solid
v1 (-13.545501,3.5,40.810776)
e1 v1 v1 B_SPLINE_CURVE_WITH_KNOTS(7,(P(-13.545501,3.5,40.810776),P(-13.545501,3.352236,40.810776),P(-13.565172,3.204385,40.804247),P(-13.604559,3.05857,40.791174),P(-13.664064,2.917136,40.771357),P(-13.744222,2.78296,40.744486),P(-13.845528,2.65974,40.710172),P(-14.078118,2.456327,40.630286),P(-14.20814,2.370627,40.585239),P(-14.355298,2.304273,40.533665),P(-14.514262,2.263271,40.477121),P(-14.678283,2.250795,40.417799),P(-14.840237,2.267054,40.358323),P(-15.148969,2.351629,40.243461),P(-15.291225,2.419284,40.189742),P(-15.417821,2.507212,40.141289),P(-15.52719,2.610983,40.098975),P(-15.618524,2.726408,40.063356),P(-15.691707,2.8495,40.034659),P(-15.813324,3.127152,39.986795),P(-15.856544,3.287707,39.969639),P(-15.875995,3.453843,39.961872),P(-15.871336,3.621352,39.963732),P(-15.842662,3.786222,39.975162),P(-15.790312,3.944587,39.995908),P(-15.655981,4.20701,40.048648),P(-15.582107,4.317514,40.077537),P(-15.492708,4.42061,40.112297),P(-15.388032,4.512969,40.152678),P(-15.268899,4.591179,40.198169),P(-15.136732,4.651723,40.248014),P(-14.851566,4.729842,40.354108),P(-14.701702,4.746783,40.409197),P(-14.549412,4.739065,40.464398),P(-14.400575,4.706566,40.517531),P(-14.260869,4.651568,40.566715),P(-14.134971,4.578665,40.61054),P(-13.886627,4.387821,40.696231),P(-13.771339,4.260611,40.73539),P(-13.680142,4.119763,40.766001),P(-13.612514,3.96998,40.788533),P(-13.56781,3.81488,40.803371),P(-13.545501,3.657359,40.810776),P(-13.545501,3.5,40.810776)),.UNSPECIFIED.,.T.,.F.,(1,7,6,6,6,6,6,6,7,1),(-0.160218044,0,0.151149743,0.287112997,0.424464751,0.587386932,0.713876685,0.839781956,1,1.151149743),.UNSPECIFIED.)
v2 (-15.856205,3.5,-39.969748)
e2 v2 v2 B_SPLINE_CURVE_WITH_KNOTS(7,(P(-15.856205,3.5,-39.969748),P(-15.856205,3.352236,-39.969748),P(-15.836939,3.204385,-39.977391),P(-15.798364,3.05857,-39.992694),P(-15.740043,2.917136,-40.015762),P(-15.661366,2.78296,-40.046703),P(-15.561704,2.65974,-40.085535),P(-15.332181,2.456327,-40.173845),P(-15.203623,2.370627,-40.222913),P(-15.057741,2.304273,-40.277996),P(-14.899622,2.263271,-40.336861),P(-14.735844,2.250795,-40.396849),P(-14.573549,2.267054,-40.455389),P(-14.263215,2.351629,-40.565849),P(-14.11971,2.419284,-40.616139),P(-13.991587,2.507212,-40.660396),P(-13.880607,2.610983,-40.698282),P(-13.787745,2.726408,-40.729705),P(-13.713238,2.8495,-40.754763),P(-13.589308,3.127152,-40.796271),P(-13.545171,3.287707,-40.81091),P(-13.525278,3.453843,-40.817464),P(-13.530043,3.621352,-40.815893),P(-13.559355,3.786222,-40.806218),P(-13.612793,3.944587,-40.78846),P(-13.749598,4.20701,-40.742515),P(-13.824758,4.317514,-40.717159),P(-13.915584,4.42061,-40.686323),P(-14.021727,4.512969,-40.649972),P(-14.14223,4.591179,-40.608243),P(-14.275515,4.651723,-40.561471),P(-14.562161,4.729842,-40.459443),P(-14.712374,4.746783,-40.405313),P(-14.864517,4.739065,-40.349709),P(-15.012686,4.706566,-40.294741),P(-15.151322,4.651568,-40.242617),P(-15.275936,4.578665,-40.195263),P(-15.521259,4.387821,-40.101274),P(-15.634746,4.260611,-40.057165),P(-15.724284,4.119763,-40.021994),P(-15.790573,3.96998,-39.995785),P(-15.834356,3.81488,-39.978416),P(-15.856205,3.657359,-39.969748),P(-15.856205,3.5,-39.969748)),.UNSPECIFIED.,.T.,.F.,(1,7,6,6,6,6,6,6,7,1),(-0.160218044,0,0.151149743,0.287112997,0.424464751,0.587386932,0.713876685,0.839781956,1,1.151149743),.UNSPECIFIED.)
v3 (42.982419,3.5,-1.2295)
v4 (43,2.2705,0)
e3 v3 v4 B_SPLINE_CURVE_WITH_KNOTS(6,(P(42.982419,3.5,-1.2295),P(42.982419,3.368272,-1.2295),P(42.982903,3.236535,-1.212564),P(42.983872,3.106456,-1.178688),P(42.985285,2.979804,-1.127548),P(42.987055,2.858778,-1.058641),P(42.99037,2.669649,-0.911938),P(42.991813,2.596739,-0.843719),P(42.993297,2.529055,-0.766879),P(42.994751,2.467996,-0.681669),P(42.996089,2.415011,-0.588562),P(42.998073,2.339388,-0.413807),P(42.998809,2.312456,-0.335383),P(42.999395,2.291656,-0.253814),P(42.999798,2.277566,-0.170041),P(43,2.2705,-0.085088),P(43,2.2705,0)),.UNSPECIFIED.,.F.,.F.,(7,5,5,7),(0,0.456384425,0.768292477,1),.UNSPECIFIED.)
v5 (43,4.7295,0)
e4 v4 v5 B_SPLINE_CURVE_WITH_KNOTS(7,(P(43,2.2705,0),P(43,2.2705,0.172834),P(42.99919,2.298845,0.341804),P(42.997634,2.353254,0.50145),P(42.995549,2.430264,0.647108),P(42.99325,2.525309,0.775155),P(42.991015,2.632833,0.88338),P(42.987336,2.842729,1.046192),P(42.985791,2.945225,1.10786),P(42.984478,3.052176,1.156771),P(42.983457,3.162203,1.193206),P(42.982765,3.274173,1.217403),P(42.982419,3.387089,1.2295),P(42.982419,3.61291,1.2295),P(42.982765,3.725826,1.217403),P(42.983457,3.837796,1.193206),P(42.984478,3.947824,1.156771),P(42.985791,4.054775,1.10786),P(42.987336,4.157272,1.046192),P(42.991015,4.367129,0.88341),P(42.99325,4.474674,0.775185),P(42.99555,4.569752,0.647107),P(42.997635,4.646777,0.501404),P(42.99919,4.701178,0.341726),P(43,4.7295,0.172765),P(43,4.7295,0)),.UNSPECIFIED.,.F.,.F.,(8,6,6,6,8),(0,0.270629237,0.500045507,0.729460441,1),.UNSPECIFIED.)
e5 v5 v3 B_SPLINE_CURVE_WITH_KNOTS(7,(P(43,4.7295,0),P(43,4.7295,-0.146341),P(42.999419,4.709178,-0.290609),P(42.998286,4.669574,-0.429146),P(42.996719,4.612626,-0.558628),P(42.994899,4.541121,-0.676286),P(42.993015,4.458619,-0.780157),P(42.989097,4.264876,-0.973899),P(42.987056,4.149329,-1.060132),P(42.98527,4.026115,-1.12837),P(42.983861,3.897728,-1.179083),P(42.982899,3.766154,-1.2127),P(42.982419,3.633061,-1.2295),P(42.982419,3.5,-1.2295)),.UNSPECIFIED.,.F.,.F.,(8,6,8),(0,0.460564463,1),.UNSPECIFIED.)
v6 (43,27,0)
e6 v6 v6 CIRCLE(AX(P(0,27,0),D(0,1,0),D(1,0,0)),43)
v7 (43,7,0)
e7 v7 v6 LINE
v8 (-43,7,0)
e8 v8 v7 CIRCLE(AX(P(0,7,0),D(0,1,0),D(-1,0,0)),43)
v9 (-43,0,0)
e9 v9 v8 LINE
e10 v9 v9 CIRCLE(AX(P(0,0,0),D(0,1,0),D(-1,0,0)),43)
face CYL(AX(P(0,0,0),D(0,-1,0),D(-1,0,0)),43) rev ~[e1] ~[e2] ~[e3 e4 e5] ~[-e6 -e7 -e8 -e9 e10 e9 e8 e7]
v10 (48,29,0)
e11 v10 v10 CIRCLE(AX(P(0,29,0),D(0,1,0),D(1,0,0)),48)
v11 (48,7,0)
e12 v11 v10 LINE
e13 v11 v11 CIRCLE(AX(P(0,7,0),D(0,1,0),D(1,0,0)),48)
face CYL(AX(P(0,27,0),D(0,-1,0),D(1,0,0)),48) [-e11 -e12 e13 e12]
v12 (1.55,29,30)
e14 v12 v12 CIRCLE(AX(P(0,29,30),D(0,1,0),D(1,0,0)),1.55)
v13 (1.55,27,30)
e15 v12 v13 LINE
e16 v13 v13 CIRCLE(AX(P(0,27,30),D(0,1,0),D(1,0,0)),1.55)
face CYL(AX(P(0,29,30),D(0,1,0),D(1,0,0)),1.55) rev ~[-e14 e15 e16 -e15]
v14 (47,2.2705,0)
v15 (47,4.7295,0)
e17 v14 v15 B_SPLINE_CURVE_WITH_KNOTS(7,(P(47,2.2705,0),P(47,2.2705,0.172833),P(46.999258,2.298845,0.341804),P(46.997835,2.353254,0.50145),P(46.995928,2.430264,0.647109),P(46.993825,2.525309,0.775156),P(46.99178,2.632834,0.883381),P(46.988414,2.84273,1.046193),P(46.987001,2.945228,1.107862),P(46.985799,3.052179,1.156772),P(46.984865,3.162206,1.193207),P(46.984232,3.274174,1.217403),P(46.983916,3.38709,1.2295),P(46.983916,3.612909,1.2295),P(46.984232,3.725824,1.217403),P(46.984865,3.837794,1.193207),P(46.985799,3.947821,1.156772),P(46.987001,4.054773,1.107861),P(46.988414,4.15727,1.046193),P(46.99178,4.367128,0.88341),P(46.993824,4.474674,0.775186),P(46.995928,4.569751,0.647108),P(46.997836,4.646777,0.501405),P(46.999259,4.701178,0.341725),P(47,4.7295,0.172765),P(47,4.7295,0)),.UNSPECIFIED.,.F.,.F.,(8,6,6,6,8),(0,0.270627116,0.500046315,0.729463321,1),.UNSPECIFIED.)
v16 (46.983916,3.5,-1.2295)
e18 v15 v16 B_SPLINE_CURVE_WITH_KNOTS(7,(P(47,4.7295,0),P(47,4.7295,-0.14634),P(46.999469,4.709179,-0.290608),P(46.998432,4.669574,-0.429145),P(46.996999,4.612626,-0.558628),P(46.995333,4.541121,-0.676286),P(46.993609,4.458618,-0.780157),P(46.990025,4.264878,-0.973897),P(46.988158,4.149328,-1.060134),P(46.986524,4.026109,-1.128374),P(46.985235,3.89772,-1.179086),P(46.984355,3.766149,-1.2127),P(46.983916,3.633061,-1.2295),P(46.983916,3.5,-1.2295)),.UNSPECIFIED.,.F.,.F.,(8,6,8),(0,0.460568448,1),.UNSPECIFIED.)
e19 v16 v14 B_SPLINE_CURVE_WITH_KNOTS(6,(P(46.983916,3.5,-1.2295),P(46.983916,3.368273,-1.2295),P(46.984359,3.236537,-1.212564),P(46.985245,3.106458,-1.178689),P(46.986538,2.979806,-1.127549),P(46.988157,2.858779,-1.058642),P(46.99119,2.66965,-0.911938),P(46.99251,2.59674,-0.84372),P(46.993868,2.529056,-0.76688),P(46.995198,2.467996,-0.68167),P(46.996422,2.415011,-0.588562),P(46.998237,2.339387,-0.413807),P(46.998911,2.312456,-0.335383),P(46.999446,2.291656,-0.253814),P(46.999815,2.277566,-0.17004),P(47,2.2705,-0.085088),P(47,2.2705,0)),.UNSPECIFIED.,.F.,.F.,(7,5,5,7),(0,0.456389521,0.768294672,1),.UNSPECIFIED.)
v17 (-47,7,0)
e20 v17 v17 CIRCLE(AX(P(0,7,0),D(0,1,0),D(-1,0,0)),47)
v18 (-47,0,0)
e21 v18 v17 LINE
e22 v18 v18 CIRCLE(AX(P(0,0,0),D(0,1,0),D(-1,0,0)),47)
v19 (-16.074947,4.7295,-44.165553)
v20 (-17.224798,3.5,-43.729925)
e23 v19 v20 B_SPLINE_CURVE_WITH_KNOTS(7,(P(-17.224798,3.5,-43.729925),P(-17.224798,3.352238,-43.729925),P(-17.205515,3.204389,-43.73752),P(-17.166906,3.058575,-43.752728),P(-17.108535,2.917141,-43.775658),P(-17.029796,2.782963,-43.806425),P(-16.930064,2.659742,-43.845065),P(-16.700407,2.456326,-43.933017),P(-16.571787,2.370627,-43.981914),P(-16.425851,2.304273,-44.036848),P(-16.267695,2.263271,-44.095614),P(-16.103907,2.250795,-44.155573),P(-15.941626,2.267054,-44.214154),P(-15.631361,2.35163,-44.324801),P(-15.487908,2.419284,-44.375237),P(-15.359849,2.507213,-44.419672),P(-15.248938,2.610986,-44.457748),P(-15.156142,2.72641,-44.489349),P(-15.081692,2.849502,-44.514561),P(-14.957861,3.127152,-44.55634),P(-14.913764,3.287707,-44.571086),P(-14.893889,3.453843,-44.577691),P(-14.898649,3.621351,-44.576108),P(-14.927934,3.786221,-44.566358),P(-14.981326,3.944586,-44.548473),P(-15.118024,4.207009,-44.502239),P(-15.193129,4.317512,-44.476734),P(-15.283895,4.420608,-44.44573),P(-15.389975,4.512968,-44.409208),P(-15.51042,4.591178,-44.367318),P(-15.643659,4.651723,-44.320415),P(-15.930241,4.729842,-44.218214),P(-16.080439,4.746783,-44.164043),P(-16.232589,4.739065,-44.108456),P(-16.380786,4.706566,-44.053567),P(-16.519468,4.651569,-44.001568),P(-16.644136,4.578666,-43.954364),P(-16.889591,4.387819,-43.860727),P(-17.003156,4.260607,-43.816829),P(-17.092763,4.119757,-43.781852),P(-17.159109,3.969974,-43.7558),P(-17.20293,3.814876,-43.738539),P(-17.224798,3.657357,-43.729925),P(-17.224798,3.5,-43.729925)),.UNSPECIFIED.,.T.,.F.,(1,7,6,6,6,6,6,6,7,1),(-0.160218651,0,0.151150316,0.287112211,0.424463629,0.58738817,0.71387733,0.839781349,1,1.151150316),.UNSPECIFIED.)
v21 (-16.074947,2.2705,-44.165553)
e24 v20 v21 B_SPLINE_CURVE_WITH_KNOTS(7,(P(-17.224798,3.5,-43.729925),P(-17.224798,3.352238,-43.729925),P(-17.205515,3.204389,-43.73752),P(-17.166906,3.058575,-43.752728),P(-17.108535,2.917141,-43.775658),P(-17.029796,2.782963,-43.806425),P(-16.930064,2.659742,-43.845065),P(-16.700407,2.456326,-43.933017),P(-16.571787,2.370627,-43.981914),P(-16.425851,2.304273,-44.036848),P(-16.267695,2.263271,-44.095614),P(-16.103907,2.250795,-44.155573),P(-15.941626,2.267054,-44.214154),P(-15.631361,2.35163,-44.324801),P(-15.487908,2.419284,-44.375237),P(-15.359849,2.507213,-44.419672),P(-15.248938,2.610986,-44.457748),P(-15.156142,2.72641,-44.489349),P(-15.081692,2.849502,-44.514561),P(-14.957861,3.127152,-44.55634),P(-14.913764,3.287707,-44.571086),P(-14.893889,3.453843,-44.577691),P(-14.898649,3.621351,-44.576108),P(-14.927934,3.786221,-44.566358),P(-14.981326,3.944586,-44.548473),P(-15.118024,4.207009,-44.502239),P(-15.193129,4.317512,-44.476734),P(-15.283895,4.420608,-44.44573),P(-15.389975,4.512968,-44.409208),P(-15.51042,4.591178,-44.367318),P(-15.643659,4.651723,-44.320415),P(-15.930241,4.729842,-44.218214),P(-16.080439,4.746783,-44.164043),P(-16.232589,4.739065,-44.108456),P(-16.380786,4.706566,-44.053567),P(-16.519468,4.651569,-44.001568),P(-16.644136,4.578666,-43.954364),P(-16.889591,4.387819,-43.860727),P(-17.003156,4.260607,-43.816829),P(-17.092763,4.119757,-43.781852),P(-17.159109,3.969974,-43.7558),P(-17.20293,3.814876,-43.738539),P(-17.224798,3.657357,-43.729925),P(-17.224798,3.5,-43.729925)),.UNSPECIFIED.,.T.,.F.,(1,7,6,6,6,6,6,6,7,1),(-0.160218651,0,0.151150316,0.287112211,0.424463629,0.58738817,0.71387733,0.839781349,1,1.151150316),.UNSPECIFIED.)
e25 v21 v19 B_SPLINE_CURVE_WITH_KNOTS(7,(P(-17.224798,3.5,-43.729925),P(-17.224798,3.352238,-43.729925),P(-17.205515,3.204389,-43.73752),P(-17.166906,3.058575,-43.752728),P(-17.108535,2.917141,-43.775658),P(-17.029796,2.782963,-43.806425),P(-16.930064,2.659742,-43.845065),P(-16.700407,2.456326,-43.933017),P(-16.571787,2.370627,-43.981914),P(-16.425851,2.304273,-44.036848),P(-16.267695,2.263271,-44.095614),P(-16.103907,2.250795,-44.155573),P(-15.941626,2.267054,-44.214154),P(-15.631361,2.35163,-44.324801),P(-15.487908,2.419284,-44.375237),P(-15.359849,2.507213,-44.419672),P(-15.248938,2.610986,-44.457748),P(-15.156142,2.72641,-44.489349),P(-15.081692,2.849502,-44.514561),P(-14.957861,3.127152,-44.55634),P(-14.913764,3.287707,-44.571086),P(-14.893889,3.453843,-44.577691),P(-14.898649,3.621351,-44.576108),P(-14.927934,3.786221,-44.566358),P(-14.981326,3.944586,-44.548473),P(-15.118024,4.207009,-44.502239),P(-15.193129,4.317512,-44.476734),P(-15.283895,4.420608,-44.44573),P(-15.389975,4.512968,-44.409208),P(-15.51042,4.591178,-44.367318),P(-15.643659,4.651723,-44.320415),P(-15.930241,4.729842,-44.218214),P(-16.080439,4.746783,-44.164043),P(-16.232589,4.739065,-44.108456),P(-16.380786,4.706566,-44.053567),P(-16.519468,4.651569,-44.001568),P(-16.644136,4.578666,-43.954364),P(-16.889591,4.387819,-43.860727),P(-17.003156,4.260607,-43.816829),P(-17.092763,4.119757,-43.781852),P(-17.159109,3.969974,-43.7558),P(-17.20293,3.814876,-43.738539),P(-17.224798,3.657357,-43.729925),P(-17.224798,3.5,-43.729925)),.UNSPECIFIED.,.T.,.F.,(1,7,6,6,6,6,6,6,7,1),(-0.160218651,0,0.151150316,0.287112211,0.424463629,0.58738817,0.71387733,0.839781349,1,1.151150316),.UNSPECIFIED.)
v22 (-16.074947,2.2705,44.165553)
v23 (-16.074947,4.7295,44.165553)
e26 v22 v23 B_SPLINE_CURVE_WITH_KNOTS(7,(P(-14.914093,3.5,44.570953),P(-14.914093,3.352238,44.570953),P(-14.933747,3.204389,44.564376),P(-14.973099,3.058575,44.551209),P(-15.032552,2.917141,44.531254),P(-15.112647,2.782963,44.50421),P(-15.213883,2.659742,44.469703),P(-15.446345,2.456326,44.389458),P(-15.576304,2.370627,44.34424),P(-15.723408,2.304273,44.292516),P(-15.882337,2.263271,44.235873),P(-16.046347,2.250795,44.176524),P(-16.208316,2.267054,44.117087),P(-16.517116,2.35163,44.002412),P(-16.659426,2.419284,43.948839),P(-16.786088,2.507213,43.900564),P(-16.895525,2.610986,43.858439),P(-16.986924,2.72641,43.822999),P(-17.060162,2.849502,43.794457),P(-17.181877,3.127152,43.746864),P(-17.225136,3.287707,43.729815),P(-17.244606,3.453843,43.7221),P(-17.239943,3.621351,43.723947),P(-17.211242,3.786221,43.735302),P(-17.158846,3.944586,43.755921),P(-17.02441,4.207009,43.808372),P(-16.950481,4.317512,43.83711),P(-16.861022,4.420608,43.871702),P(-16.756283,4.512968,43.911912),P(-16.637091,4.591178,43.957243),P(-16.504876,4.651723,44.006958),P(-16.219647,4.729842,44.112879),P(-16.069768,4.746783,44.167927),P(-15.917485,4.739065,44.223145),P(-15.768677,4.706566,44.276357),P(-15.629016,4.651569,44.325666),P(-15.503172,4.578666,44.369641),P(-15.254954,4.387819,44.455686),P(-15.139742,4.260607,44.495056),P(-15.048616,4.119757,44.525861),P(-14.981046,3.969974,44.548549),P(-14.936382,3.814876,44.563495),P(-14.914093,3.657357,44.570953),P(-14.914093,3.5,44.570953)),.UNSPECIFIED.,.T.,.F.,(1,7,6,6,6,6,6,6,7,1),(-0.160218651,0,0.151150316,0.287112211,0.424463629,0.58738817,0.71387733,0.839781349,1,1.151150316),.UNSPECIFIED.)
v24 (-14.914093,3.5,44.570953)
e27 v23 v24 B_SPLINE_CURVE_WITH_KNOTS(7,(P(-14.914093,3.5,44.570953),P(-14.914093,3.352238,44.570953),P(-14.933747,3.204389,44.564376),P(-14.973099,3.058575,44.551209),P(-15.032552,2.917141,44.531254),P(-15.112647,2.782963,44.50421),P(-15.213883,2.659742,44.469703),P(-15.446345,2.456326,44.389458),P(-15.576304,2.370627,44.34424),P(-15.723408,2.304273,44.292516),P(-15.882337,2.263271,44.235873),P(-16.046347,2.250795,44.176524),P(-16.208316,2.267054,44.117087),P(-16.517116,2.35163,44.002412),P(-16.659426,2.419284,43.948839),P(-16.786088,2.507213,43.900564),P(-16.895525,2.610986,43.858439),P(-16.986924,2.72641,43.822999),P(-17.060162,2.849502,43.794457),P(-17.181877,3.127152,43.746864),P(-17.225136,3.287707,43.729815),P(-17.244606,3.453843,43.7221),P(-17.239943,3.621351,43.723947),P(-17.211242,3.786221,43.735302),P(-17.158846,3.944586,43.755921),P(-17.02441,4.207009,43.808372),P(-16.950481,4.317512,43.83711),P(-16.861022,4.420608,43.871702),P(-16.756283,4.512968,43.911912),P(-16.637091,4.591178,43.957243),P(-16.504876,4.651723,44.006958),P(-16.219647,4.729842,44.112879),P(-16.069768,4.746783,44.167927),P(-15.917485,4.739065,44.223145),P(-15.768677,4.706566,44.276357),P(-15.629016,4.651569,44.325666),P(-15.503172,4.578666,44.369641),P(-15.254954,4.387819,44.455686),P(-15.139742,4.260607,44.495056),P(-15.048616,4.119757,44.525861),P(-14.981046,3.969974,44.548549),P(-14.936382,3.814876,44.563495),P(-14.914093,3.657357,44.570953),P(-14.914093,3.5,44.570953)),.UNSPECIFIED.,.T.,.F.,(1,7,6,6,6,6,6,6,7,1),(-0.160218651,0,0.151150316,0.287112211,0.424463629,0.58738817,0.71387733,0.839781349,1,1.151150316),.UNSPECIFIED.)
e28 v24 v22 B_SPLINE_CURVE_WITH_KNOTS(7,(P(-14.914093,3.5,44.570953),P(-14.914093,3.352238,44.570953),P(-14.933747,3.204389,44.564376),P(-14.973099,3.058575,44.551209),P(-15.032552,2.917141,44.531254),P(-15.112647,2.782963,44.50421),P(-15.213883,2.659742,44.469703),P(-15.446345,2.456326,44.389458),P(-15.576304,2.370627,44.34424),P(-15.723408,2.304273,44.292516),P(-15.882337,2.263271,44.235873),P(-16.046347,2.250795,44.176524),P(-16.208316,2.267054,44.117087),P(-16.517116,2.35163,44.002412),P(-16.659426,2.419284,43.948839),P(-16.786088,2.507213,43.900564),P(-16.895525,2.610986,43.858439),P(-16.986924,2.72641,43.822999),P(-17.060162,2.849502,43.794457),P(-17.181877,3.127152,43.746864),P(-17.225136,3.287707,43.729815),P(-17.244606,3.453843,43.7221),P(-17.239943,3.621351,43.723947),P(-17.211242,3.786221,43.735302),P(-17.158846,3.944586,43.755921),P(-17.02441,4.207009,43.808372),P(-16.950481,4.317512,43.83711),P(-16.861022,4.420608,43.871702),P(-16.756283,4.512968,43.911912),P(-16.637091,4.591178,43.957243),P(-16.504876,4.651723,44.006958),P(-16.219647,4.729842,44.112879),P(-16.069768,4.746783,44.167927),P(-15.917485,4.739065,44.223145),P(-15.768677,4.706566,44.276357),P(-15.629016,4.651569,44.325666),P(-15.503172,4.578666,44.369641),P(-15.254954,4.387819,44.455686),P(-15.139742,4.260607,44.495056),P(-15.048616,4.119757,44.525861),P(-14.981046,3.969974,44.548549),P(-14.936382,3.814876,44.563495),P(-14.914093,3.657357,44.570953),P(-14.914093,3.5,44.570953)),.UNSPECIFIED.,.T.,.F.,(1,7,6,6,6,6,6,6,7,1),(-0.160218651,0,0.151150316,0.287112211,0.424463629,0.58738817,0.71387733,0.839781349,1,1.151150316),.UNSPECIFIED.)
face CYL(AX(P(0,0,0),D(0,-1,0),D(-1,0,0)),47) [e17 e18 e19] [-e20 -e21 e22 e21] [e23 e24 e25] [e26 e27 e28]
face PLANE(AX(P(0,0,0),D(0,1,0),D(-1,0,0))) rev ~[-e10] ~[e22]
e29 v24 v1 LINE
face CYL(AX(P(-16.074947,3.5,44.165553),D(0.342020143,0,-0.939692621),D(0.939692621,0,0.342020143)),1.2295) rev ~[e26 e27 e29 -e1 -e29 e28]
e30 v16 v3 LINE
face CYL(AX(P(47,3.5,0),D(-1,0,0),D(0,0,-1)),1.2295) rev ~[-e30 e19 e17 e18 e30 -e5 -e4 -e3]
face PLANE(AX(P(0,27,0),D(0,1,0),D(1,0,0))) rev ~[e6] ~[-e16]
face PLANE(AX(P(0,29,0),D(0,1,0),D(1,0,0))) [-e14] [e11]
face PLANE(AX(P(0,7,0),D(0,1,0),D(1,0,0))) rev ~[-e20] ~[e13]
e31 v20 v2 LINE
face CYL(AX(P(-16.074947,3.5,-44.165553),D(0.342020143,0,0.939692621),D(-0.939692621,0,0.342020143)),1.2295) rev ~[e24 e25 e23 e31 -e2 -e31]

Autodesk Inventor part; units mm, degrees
ref_plane "XZ Plane" through (0, 0, 0) normal (0, 1, 0) x (-1, 0, 0)
ref_plane "XY Plane" through (0, 0, 0) normal (0, 0, 1) x (1, 0, 0)
sketch "Sketch1" plane through (0, 0, 0) normal (0, 1, 0) x (-1, 0, 0)
  circle A0 centre (0, 0) radius 47
  circle A1 centre (0, 0) radius 43
  dimension "d0" = 94
  dimension "d8" = 4
extrude "Extrusion1" add sketch "Sketch1" along normal blind 7
sketch "Sketch2" plane through (0, 7, 0) normal (0, 1, 0) x (1, 0, 0)
  circle A0 centre (0, 0) radius 43
  circle A1 centre (0, 0) radius 48
  dimension "d38" = 86
  dimension "d39" = 96
extrude "Extrusion2" add sketch "Sketch2" along normal blind 20
sketch "Sketch6" plane through (0, 27, 0) normal (0, 1, 0) x (1, 0, 0)
  circle A0 centre (0, 0) radius 48 projected
extrude "Extrusion5" add sketch "Sketch6" along normal blind 2
ref_plane "Work Plane2" through (47, 0, 0) normal (1, 0, 0) x (0, 1, 0)
sketch "Sketch7" plane through (47, 0, 0) normal (1, 0, 0) x (0, 1, 0)
  point P0 (0, 0)
  point P1 (3.5, 0)
hole "Hole1" at (47, 3.5, 0) direction (-1, 0, 0) diameter 2.459 depth 5 thread size "M3x0.5" class "6H" standard "ISO Metric profile"
pattern_circular "Circular Pattern6" count 3 over 220 about axis through (0, 0, 0) along (0, 1, 0) of "Hole1" both ways yes
sketch "Sketch8" plane through (0, 29, 0) normal (0, 1, 0) x (1, 0, 0)
  circle A0 centre (0, -30) radius 1.55
  point P0 (0, 0)
  dimension "d62" = 3.1
extrude "Extrusion6" cut sketch "Sketch8" against normal blind 2
properties part number "Abdeckung_Gaseinlass_new"
